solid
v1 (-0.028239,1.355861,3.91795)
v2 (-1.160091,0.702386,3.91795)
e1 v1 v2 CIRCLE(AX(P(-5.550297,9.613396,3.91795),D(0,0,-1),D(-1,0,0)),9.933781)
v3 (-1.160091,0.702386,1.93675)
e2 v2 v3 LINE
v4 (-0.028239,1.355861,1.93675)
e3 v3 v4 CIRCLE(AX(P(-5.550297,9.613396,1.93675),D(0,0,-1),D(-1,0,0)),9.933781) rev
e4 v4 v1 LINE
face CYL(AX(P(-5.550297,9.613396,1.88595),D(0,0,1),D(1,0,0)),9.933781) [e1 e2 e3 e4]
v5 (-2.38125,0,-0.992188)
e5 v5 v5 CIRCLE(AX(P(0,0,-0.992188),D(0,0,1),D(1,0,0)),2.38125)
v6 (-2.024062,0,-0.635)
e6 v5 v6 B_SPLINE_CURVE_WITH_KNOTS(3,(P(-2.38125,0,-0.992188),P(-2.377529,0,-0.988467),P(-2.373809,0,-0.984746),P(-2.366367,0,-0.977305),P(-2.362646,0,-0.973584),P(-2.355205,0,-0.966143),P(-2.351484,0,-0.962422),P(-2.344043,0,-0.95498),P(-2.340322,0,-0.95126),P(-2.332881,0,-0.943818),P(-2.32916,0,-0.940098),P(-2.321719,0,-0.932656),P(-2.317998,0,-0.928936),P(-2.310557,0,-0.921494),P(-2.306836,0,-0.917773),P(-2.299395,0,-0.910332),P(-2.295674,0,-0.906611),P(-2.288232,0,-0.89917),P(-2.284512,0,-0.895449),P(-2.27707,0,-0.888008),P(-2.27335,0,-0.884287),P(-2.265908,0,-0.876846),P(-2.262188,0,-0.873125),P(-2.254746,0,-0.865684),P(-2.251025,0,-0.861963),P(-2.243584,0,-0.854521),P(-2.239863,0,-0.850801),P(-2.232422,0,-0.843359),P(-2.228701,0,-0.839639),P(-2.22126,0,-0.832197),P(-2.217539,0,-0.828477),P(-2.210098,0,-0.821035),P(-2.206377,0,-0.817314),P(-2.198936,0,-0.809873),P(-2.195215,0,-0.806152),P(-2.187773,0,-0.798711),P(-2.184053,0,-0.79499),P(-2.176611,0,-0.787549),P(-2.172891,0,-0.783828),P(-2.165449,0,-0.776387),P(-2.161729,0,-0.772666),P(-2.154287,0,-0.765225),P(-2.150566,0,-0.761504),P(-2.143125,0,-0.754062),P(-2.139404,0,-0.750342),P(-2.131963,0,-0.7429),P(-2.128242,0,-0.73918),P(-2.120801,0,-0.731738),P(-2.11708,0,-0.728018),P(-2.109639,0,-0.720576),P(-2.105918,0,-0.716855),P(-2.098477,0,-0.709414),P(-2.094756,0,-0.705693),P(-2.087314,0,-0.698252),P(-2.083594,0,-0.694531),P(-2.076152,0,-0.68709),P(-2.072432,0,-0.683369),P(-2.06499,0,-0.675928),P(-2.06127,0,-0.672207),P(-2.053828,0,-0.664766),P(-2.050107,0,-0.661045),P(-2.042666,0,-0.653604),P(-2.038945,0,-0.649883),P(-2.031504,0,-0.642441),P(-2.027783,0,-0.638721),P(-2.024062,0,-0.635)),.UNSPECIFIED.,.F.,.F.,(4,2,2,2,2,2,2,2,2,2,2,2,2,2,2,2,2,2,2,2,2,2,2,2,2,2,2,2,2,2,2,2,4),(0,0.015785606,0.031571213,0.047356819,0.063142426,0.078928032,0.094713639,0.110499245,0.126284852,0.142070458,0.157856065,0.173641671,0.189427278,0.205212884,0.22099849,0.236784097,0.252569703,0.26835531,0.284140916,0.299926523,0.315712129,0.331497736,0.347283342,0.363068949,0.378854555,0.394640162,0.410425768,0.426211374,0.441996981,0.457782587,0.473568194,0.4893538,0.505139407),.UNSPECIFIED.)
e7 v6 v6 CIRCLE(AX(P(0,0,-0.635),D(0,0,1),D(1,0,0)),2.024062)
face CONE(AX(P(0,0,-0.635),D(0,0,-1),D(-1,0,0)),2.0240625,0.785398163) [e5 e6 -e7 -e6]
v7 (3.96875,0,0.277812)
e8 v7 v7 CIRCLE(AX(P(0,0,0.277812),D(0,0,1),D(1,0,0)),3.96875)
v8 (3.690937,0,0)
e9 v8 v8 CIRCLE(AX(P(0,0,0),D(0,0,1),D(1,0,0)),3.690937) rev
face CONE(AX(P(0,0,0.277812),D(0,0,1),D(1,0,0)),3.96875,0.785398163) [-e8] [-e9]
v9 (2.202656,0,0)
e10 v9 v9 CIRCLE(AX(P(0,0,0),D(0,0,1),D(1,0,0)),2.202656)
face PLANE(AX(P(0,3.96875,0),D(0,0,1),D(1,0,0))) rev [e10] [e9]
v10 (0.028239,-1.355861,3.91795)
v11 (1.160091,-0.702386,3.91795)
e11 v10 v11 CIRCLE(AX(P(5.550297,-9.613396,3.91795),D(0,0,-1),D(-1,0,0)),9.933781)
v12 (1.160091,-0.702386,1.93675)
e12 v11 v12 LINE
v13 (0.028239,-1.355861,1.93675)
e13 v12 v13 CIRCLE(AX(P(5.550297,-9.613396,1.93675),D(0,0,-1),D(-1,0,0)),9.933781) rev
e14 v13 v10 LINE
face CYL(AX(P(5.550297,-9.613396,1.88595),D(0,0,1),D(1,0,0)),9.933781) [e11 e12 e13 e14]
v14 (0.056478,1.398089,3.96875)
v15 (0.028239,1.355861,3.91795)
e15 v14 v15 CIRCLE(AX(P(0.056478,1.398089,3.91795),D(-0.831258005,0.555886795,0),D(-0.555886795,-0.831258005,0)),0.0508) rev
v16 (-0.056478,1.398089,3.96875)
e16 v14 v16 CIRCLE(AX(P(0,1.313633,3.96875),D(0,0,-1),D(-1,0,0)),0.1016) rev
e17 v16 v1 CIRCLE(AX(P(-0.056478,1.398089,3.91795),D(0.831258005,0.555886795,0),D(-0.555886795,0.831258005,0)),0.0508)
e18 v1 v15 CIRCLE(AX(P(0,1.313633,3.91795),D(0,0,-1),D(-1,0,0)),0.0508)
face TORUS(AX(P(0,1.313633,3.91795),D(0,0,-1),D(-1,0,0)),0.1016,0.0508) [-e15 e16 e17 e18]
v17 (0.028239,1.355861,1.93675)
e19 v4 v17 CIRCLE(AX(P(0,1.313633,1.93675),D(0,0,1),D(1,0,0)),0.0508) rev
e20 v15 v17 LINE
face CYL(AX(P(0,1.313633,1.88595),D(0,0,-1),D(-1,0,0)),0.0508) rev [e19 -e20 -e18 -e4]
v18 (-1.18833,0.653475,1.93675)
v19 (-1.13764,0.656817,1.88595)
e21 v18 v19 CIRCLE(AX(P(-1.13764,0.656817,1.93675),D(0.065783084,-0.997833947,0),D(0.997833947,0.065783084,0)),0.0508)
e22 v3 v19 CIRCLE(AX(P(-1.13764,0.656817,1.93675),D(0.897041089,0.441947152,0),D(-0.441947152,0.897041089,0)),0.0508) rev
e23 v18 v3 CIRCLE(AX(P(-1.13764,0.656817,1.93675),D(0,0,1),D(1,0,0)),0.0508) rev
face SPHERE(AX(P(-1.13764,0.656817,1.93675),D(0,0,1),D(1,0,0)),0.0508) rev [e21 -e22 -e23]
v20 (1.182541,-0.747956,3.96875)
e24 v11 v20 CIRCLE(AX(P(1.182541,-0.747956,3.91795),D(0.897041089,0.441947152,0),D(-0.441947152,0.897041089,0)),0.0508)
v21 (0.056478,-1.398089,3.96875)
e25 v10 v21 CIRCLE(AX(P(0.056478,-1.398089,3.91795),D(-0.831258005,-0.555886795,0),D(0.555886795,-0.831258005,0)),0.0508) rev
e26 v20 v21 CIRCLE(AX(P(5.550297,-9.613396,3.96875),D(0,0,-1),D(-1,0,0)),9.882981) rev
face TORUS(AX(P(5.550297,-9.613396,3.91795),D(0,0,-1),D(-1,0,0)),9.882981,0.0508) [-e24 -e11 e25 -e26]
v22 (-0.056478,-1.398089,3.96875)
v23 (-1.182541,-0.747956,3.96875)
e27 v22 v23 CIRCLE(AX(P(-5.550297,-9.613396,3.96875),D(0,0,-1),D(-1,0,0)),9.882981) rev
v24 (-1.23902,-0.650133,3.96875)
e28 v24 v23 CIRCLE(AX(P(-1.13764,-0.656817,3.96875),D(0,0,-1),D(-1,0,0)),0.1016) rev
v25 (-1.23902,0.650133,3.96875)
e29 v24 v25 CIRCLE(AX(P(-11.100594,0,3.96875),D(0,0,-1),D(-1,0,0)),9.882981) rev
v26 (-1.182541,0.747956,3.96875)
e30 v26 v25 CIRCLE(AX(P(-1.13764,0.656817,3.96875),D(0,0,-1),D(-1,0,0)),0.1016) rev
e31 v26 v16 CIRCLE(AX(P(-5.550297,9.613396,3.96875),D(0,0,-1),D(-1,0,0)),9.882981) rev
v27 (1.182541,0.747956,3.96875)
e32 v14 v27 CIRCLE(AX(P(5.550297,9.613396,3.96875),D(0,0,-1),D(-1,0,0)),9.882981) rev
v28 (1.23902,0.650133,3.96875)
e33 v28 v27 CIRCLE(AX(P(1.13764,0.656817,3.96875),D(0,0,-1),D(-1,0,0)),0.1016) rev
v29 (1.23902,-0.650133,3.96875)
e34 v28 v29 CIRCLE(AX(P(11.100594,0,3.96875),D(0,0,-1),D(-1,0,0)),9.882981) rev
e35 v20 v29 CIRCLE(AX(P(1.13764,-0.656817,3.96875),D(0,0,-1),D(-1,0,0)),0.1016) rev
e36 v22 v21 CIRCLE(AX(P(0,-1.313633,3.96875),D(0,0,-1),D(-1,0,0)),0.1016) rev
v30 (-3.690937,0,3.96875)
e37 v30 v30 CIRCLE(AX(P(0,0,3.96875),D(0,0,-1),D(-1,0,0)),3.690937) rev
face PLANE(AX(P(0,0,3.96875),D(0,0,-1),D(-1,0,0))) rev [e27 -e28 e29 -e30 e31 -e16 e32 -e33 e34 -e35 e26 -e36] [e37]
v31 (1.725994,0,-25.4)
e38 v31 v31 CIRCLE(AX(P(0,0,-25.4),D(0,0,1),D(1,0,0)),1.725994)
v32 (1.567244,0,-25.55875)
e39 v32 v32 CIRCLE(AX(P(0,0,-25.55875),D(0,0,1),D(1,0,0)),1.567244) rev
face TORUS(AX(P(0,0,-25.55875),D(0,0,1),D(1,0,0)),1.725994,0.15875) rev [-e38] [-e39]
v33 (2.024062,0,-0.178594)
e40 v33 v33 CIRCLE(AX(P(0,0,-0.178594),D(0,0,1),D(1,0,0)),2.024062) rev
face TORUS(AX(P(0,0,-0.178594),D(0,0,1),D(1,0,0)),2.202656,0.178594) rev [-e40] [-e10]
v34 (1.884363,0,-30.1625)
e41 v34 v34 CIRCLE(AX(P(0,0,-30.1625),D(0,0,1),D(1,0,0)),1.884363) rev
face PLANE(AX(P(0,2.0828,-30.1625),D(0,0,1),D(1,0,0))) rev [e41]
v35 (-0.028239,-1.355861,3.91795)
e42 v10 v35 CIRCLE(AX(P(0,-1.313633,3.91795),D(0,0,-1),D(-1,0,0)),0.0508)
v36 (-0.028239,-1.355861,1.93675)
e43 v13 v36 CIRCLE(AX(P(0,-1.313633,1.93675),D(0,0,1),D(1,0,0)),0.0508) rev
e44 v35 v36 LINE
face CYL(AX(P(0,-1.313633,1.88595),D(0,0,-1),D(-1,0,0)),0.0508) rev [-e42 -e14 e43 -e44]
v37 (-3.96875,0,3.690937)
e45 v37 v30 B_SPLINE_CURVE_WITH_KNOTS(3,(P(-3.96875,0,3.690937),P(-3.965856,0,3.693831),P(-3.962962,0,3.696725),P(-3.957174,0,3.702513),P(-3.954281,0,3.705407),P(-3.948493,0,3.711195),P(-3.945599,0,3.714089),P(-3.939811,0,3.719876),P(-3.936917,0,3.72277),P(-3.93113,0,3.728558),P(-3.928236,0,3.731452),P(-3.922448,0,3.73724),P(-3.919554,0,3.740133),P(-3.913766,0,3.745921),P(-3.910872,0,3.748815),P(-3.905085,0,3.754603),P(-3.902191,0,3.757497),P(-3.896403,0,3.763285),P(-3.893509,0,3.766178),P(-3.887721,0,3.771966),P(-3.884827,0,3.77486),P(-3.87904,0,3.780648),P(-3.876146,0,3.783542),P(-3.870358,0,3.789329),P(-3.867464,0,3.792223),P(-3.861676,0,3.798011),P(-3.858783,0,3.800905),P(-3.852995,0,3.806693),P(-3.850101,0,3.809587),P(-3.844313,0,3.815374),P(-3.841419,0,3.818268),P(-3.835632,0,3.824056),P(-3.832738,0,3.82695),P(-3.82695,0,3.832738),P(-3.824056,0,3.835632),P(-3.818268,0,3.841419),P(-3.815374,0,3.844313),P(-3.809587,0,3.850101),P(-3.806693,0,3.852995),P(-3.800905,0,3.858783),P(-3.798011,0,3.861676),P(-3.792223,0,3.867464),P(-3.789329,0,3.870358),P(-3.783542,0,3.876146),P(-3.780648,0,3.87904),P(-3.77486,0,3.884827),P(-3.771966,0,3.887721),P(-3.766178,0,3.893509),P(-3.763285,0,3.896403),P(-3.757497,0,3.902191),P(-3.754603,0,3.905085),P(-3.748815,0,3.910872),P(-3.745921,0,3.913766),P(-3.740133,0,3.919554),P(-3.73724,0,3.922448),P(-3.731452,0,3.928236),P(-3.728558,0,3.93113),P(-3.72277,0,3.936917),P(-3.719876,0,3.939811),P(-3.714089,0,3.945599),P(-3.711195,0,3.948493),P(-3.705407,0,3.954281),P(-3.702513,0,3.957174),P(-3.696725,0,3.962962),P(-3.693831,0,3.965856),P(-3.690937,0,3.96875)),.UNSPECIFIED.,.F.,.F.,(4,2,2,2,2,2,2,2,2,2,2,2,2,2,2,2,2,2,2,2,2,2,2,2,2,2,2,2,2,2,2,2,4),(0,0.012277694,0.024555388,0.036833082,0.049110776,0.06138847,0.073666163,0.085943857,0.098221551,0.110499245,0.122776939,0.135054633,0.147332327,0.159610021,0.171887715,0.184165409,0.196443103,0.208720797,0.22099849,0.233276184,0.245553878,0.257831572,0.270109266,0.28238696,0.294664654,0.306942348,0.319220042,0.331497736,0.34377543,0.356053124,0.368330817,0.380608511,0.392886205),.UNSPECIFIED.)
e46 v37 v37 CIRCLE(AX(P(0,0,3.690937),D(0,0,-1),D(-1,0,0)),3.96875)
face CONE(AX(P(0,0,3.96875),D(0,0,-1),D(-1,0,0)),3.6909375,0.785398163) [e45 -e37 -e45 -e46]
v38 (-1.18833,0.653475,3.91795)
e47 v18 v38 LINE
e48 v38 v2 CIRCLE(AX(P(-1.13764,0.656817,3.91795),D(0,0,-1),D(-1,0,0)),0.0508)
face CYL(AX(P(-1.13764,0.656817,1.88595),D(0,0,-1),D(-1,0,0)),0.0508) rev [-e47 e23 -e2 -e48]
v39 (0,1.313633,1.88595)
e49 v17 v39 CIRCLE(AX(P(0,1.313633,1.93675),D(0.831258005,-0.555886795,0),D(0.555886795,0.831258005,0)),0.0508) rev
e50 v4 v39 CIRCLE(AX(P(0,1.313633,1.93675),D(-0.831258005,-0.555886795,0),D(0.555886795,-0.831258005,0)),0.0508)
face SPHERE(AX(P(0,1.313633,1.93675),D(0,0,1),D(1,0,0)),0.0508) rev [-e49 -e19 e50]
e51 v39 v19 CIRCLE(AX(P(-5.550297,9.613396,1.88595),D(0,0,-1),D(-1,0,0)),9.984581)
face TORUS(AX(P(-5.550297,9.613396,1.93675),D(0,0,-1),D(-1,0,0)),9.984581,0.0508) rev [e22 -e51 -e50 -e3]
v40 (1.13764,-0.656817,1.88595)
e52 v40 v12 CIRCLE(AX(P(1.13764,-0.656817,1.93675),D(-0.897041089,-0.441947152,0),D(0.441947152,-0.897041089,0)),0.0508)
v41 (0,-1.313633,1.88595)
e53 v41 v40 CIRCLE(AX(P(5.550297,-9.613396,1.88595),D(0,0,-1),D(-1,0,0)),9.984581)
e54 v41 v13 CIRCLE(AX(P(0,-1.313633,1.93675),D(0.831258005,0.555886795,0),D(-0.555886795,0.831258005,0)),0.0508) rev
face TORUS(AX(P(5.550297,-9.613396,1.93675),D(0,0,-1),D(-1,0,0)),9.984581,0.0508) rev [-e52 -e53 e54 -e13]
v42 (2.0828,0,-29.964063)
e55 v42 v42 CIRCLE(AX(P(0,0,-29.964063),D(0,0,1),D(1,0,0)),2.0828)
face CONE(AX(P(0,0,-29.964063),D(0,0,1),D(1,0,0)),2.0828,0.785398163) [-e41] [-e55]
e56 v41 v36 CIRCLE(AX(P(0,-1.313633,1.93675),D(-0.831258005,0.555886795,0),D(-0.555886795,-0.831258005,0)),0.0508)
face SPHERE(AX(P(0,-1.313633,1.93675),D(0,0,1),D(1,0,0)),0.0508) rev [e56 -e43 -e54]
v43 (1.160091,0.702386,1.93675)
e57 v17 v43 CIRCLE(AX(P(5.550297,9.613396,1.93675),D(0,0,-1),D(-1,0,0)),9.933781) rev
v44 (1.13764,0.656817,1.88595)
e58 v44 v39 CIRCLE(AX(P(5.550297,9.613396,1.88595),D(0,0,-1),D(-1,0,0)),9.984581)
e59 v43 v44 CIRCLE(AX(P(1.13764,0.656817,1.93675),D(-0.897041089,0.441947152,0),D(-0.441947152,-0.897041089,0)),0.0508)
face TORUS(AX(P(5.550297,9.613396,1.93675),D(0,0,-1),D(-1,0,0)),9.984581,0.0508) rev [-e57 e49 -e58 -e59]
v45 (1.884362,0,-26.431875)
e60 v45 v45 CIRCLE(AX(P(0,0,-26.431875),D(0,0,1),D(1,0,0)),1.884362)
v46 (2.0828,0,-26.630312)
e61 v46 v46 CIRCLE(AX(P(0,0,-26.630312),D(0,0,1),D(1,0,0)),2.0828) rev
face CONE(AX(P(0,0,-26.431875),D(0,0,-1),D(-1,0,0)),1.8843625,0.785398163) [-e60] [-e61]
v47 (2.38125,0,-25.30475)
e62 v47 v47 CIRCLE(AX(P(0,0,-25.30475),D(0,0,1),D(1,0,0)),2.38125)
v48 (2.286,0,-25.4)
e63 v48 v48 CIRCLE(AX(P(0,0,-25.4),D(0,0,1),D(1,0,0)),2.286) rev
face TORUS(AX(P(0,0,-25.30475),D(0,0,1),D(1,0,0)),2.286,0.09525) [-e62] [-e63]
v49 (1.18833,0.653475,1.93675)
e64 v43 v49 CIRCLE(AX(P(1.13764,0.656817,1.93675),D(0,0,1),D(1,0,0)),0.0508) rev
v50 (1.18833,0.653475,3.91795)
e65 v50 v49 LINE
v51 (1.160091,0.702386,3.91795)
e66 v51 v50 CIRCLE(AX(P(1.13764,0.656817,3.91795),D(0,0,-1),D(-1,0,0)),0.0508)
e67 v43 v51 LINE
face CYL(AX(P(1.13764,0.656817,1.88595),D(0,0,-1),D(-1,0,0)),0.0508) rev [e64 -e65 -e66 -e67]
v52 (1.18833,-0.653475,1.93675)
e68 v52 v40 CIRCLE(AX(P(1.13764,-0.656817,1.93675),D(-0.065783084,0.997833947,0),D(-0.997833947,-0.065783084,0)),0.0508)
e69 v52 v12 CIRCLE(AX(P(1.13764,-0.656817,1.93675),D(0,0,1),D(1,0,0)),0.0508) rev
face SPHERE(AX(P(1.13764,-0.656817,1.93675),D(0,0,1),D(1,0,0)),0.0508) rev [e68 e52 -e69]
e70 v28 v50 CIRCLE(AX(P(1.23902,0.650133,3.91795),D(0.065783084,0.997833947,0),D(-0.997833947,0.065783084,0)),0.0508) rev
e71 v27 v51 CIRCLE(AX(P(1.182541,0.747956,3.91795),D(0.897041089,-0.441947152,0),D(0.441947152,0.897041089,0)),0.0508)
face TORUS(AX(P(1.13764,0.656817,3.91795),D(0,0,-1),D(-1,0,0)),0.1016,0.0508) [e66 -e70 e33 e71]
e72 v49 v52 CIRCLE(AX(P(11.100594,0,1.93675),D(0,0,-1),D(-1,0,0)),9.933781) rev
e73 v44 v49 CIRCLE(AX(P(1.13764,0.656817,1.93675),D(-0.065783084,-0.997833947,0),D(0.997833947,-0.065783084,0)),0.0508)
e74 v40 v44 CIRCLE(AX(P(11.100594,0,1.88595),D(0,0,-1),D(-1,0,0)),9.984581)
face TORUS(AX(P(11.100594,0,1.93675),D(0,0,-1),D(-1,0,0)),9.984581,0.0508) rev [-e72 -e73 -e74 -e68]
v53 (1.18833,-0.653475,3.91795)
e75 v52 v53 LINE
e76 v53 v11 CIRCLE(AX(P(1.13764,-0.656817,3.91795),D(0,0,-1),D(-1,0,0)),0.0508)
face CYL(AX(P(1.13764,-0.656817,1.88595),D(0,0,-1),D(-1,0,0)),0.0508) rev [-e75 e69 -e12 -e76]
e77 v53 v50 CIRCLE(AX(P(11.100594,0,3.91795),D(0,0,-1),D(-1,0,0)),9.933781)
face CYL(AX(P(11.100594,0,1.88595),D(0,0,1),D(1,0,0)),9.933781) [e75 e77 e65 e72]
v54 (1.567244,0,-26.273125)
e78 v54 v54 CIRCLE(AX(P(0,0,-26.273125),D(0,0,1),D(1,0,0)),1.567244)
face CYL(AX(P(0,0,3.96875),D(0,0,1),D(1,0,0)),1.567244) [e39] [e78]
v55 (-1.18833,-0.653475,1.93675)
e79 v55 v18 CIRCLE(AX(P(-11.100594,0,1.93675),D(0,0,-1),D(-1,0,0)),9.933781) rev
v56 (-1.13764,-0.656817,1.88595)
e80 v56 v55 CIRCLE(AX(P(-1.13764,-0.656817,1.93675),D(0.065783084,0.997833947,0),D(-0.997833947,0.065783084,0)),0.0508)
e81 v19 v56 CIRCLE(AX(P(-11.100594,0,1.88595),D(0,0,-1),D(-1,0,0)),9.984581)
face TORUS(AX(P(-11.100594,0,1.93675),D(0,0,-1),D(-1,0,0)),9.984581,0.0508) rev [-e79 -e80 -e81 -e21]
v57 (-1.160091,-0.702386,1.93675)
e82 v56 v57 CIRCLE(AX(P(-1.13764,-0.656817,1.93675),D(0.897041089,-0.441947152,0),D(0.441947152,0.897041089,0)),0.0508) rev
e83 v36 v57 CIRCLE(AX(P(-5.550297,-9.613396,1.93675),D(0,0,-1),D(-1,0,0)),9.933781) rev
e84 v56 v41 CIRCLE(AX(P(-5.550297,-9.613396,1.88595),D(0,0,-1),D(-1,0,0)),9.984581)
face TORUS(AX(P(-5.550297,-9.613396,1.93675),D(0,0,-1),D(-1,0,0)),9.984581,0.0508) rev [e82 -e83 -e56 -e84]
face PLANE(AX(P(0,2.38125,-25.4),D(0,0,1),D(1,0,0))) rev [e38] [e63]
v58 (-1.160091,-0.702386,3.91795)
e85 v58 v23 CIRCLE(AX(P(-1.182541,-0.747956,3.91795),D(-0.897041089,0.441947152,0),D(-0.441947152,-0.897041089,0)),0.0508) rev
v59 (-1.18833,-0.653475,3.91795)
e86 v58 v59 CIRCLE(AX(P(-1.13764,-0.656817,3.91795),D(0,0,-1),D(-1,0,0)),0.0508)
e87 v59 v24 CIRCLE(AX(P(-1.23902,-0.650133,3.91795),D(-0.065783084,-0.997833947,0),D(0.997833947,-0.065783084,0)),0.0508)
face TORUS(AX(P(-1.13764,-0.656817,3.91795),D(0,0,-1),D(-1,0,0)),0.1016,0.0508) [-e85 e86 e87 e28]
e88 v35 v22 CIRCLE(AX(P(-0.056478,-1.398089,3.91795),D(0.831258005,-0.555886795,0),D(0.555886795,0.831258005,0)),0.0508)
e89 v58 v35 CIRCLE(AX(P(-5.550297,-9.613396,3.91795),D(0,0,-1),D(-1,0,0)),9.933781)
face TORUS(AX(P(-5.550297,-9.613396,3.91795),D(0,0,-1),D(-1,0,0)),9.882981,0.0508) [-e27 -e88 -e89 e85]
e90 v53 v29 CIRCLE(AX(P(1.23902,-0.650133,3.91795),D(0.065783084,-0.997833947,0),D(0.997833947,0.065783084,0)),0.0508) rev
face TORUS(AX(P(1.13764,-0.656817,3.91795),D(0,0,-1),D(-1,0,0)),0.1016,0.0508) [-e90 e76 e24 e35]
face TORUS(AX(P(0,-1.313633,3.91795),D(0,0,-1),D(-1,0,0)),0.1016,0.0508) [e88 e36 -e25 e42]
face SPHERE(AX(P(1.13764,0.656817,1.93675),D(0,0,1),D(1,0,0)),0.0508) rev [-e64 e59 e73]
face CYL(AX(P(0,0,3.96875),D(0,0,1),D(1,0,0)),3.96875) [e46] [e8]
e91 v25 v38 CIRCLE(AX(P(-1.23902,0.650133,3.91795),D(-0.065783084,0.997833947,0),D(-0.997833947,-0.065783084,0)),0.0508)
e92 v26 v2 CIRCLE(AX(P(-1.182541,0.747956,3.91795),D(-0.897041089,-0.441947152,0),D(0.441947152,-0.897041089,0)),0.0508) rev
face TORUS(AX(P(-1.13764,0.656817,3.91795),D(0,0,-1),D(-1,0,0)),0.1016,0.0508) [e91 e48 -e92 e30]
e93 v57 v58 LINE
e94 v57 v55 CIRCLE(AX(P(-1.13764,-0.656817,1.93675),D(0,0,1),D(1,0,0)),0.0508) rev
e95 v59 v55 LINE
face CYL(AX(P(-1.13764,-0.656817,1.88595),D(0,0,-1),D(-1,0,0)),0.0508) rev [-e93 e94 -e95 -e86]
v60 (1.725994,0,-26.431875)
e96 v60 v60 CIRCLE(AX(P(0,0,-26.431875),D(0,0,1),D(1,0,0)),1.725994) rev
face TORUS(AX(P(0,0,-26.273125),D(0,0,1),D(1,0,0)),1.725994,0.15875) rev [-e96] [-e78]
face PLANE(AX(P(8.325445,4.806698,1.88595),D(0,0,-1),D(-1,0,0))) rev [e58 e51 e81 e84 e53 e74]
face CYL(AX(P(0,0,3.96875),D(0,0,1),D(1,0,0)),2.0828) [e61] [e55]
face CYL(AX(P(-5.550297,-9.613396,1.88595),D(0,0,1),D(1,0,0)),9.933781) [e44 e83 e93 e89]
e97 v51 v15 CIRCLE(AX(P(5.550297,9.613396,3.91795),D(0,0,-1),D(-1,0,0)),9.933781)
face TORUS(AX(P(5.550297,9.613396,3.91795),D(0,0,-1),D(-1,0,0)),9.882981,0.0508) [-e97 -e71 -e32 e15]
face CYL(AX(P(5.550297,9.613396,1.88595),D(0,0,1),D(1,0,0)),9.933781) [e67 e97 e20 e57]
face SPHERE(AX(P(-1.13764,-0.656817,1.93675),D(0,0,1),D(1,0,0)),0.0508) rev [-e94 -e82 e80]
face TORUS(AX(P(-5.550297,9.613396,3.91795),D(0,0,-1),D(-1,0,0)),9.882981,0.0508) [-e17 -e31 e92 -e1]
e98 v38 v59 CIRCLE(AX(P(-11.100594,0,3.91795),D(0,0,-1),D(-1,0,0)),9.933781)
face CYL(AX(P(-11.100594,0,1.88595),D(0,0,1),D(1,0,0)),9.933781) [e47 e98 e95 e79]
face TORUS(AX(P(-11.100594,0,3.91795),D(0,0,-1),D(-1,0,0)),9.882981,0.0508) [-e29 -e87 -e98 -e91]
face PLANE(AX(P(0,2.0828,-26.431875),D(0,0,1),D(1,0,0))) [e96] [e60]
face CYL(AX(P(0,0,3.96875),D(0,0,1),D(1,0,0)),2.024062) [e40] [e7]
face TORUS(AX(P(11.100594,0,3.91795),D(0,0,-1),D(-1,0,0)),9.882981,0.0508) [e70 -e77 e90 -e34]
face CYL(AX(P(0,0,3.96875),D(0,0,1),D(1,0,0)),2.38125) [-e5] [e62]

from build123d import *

# Parameters (mm, degrees)
SKETCH4_W          = 0.9921875
SKETCH4_H          = 0.3571875
SKETCH4_W_2        = 1.031875
SKETCH4_H_2        = 0.515555748
CHAMFER1_SIZE      = 0.3571875
FILLET1_R          = 0.17859375
FILLET2_R          = 0.15875
CHAMFER2_SIZE      = 0.1984375
FILLET3_R          = 0.09525
CHAMFER3_SIZE      = 0.2778125
CUT_EXTRUDE1_DEPTH = 2.0828
FILLET4_R          = 0.0508


with BuildPart() as part:
    # Sketch3 → Revolve1 (revolve)
    with BuildSketch(Plane(origin=(0, 0, 0), x_dir=(0, 0, -1), z_dir=(1, 0, 0)), mode=Mode.PRIVATE) as revolve1_sk:
        Polygon((-3.96875, 3.96875), (0, 3.96875), (0, 2.38125), (25.4, 2.38125), (25.4, 2.0828), (30.1625, 2.0828), (30.1625, 0), (-3.96875, 0), align=None)
    revolve(revolve1_sk.sketch.rotate(Axis((0, 0, 3.96875), (0, 0, -1)), 90), axis=Axis((0, 0, 3.96875), (0, 0, -1)))

    # Sketch4 → Cut-Revolve1 (revolve, cut)
    with BuildSketch(Plane(origin=(0, 0, 0), x_dir=(0, 0, -1), z_dir=(1, 0, 0)), mode=Mode.PRIVATE) as cut_revolve1_sk:
        with Locations((0.49609375, 2.20265625)):
            Rectangle(SKETCH4_W, SKETCH4_H)
        with Locations((25.9159375, 1.825022126)):
            Rectangle(SKETCH4_W_2, SKETCH4_H_2)
    revolve(cut_revolve1_sk.sketch.rotate(Axis((0, 0, 3.96875), (0, 0, -1)), 90), axis=Axis((0, 0, 3.96875), (0, 0, -1)), mode=Mode.SUBTRACT)

    # Chamfer1
    chamfer1_edges = [part.edges().sort_by_distance(p)[0] for p in [
        (-2.0240625, 0, -0.9921875),
    ]]
    chamfer(chamfer1_edges, length=CHAMFER1_SIZE - 0.0001)  # a hair under: the kernel refuses the full size

    # Fillet1
    fillet1_edges = [part.edges().sort_by_distance(p)[0] for p in [
        (-2.0240625, 0, 0),
    ]]
    fillet(fillet1_edges, radius=FILLET1_R)

    # Fillet2
    fillet2_edges = [part.edges().sort_by_distance(p)[0] for p in [
        (-1.567244252, 0, -25.4),
        (-1.567244252, 0, -26.431875),
    ]]
    fillet(fillet2_edges, radius=FILLET2_R)

    # Chamfer2
    chamfer2_edges = [part.edges().sort_by_distance(p)[0] for p in [
        (-2.0828, 0, -26.431875),
        (-2.0828, 0, -30.1625),
    ]]
    chamfer(chamfer2_edges, length=CHAMFER2_SIZE)

    # Fillet3
    fillet3_edges = [part.edges().sort_by_distance(p)[0] for p in [
        (-2.38125, 0, -25.4),
    ]]
    fillet(fillet3_edges, radius=FILLET3_R)

    # Chamfer3
    chamfer3_edges = [part.edges().sort_by_distance(p)[0] for p in [
        (-3.96875, 0, 0),
        (-3.96875, 0, 3.96875),
    ]]
    chamfer(chamfer3_edges, length=CHAMFER3_SIZE)

    # Sketch5 → Cut-Extrude1 (cut)
    with BuildSketch(Plane.XY.offset(3.96875)):
        with BuildLine():
            ThreePointArc((1.190625, 0.687407664), (0.58340625, 1.010489266), (0, 1.374815329))
            ThreePointArc((0, 1.374815329), (-0.58340625, 1.010489266), (-1.190625, 0.687407664))
            ThreePointArc((-1.190625, 0.687407664), (-1.1668125, 0), (-1.190625, -0.687407664))
            ThreePointArc((-1.190625, -0.687407664), (-0.58340625, -1.010489266), (0, -1.374815329))
            ThreePointArc((0, -1.374815329), (0.58340625, -1.010489266), (1.190625, -0.687407664))
            ThreePointArc((1.190625, -0.687407664), (1.1668125, 0), (1.190625, 0.687407664))
        make_face()
    extrude(amount=-CUT_EXTRUDE1_DEPTH, mode=Mode.SUBTRACT)

    # Fillet4
    fillet4_edges = [part.edges().sort_by_distance(p)[0] for p in [
        (1.1668125, 0, 1.88595),
        (1.190625, 0.687407664, 2.92735),
        (0.58340625, -1.010489266, 1.88595),
        (1.190625, -0.687407664, 2.92735),
        (-0.58340625, -1.010489266, 1.88595),
        (0, -1.374815329, 2.92735),
        (-1.1668125, 0, 1.88595),
        (-1.190625, -0.687407664, 2.92735),
        (-0.58340625, 1.010489266, 1.88595),
        (-1.190625, 0.687407664, 2.92735),
        (0.58340625, 1.010489266, 1.88595),
        (0, 1.374815329, 2.92735),
        (1.1668125, 0, 3.96875),
        (0.58340625, 1.010489266, 3.96875),
        (-0.58340625, 1.010489266, 3.96875),
        (-1.1668125, 0, 3.96875),
        (-0.58340625, -1.010489266, 3.96875),
        (0.58340625, -1.010489266, 3.96875),
    ]]
    fillet(fillet4_edges, radius=FILLET4_R)


solid = part.part
